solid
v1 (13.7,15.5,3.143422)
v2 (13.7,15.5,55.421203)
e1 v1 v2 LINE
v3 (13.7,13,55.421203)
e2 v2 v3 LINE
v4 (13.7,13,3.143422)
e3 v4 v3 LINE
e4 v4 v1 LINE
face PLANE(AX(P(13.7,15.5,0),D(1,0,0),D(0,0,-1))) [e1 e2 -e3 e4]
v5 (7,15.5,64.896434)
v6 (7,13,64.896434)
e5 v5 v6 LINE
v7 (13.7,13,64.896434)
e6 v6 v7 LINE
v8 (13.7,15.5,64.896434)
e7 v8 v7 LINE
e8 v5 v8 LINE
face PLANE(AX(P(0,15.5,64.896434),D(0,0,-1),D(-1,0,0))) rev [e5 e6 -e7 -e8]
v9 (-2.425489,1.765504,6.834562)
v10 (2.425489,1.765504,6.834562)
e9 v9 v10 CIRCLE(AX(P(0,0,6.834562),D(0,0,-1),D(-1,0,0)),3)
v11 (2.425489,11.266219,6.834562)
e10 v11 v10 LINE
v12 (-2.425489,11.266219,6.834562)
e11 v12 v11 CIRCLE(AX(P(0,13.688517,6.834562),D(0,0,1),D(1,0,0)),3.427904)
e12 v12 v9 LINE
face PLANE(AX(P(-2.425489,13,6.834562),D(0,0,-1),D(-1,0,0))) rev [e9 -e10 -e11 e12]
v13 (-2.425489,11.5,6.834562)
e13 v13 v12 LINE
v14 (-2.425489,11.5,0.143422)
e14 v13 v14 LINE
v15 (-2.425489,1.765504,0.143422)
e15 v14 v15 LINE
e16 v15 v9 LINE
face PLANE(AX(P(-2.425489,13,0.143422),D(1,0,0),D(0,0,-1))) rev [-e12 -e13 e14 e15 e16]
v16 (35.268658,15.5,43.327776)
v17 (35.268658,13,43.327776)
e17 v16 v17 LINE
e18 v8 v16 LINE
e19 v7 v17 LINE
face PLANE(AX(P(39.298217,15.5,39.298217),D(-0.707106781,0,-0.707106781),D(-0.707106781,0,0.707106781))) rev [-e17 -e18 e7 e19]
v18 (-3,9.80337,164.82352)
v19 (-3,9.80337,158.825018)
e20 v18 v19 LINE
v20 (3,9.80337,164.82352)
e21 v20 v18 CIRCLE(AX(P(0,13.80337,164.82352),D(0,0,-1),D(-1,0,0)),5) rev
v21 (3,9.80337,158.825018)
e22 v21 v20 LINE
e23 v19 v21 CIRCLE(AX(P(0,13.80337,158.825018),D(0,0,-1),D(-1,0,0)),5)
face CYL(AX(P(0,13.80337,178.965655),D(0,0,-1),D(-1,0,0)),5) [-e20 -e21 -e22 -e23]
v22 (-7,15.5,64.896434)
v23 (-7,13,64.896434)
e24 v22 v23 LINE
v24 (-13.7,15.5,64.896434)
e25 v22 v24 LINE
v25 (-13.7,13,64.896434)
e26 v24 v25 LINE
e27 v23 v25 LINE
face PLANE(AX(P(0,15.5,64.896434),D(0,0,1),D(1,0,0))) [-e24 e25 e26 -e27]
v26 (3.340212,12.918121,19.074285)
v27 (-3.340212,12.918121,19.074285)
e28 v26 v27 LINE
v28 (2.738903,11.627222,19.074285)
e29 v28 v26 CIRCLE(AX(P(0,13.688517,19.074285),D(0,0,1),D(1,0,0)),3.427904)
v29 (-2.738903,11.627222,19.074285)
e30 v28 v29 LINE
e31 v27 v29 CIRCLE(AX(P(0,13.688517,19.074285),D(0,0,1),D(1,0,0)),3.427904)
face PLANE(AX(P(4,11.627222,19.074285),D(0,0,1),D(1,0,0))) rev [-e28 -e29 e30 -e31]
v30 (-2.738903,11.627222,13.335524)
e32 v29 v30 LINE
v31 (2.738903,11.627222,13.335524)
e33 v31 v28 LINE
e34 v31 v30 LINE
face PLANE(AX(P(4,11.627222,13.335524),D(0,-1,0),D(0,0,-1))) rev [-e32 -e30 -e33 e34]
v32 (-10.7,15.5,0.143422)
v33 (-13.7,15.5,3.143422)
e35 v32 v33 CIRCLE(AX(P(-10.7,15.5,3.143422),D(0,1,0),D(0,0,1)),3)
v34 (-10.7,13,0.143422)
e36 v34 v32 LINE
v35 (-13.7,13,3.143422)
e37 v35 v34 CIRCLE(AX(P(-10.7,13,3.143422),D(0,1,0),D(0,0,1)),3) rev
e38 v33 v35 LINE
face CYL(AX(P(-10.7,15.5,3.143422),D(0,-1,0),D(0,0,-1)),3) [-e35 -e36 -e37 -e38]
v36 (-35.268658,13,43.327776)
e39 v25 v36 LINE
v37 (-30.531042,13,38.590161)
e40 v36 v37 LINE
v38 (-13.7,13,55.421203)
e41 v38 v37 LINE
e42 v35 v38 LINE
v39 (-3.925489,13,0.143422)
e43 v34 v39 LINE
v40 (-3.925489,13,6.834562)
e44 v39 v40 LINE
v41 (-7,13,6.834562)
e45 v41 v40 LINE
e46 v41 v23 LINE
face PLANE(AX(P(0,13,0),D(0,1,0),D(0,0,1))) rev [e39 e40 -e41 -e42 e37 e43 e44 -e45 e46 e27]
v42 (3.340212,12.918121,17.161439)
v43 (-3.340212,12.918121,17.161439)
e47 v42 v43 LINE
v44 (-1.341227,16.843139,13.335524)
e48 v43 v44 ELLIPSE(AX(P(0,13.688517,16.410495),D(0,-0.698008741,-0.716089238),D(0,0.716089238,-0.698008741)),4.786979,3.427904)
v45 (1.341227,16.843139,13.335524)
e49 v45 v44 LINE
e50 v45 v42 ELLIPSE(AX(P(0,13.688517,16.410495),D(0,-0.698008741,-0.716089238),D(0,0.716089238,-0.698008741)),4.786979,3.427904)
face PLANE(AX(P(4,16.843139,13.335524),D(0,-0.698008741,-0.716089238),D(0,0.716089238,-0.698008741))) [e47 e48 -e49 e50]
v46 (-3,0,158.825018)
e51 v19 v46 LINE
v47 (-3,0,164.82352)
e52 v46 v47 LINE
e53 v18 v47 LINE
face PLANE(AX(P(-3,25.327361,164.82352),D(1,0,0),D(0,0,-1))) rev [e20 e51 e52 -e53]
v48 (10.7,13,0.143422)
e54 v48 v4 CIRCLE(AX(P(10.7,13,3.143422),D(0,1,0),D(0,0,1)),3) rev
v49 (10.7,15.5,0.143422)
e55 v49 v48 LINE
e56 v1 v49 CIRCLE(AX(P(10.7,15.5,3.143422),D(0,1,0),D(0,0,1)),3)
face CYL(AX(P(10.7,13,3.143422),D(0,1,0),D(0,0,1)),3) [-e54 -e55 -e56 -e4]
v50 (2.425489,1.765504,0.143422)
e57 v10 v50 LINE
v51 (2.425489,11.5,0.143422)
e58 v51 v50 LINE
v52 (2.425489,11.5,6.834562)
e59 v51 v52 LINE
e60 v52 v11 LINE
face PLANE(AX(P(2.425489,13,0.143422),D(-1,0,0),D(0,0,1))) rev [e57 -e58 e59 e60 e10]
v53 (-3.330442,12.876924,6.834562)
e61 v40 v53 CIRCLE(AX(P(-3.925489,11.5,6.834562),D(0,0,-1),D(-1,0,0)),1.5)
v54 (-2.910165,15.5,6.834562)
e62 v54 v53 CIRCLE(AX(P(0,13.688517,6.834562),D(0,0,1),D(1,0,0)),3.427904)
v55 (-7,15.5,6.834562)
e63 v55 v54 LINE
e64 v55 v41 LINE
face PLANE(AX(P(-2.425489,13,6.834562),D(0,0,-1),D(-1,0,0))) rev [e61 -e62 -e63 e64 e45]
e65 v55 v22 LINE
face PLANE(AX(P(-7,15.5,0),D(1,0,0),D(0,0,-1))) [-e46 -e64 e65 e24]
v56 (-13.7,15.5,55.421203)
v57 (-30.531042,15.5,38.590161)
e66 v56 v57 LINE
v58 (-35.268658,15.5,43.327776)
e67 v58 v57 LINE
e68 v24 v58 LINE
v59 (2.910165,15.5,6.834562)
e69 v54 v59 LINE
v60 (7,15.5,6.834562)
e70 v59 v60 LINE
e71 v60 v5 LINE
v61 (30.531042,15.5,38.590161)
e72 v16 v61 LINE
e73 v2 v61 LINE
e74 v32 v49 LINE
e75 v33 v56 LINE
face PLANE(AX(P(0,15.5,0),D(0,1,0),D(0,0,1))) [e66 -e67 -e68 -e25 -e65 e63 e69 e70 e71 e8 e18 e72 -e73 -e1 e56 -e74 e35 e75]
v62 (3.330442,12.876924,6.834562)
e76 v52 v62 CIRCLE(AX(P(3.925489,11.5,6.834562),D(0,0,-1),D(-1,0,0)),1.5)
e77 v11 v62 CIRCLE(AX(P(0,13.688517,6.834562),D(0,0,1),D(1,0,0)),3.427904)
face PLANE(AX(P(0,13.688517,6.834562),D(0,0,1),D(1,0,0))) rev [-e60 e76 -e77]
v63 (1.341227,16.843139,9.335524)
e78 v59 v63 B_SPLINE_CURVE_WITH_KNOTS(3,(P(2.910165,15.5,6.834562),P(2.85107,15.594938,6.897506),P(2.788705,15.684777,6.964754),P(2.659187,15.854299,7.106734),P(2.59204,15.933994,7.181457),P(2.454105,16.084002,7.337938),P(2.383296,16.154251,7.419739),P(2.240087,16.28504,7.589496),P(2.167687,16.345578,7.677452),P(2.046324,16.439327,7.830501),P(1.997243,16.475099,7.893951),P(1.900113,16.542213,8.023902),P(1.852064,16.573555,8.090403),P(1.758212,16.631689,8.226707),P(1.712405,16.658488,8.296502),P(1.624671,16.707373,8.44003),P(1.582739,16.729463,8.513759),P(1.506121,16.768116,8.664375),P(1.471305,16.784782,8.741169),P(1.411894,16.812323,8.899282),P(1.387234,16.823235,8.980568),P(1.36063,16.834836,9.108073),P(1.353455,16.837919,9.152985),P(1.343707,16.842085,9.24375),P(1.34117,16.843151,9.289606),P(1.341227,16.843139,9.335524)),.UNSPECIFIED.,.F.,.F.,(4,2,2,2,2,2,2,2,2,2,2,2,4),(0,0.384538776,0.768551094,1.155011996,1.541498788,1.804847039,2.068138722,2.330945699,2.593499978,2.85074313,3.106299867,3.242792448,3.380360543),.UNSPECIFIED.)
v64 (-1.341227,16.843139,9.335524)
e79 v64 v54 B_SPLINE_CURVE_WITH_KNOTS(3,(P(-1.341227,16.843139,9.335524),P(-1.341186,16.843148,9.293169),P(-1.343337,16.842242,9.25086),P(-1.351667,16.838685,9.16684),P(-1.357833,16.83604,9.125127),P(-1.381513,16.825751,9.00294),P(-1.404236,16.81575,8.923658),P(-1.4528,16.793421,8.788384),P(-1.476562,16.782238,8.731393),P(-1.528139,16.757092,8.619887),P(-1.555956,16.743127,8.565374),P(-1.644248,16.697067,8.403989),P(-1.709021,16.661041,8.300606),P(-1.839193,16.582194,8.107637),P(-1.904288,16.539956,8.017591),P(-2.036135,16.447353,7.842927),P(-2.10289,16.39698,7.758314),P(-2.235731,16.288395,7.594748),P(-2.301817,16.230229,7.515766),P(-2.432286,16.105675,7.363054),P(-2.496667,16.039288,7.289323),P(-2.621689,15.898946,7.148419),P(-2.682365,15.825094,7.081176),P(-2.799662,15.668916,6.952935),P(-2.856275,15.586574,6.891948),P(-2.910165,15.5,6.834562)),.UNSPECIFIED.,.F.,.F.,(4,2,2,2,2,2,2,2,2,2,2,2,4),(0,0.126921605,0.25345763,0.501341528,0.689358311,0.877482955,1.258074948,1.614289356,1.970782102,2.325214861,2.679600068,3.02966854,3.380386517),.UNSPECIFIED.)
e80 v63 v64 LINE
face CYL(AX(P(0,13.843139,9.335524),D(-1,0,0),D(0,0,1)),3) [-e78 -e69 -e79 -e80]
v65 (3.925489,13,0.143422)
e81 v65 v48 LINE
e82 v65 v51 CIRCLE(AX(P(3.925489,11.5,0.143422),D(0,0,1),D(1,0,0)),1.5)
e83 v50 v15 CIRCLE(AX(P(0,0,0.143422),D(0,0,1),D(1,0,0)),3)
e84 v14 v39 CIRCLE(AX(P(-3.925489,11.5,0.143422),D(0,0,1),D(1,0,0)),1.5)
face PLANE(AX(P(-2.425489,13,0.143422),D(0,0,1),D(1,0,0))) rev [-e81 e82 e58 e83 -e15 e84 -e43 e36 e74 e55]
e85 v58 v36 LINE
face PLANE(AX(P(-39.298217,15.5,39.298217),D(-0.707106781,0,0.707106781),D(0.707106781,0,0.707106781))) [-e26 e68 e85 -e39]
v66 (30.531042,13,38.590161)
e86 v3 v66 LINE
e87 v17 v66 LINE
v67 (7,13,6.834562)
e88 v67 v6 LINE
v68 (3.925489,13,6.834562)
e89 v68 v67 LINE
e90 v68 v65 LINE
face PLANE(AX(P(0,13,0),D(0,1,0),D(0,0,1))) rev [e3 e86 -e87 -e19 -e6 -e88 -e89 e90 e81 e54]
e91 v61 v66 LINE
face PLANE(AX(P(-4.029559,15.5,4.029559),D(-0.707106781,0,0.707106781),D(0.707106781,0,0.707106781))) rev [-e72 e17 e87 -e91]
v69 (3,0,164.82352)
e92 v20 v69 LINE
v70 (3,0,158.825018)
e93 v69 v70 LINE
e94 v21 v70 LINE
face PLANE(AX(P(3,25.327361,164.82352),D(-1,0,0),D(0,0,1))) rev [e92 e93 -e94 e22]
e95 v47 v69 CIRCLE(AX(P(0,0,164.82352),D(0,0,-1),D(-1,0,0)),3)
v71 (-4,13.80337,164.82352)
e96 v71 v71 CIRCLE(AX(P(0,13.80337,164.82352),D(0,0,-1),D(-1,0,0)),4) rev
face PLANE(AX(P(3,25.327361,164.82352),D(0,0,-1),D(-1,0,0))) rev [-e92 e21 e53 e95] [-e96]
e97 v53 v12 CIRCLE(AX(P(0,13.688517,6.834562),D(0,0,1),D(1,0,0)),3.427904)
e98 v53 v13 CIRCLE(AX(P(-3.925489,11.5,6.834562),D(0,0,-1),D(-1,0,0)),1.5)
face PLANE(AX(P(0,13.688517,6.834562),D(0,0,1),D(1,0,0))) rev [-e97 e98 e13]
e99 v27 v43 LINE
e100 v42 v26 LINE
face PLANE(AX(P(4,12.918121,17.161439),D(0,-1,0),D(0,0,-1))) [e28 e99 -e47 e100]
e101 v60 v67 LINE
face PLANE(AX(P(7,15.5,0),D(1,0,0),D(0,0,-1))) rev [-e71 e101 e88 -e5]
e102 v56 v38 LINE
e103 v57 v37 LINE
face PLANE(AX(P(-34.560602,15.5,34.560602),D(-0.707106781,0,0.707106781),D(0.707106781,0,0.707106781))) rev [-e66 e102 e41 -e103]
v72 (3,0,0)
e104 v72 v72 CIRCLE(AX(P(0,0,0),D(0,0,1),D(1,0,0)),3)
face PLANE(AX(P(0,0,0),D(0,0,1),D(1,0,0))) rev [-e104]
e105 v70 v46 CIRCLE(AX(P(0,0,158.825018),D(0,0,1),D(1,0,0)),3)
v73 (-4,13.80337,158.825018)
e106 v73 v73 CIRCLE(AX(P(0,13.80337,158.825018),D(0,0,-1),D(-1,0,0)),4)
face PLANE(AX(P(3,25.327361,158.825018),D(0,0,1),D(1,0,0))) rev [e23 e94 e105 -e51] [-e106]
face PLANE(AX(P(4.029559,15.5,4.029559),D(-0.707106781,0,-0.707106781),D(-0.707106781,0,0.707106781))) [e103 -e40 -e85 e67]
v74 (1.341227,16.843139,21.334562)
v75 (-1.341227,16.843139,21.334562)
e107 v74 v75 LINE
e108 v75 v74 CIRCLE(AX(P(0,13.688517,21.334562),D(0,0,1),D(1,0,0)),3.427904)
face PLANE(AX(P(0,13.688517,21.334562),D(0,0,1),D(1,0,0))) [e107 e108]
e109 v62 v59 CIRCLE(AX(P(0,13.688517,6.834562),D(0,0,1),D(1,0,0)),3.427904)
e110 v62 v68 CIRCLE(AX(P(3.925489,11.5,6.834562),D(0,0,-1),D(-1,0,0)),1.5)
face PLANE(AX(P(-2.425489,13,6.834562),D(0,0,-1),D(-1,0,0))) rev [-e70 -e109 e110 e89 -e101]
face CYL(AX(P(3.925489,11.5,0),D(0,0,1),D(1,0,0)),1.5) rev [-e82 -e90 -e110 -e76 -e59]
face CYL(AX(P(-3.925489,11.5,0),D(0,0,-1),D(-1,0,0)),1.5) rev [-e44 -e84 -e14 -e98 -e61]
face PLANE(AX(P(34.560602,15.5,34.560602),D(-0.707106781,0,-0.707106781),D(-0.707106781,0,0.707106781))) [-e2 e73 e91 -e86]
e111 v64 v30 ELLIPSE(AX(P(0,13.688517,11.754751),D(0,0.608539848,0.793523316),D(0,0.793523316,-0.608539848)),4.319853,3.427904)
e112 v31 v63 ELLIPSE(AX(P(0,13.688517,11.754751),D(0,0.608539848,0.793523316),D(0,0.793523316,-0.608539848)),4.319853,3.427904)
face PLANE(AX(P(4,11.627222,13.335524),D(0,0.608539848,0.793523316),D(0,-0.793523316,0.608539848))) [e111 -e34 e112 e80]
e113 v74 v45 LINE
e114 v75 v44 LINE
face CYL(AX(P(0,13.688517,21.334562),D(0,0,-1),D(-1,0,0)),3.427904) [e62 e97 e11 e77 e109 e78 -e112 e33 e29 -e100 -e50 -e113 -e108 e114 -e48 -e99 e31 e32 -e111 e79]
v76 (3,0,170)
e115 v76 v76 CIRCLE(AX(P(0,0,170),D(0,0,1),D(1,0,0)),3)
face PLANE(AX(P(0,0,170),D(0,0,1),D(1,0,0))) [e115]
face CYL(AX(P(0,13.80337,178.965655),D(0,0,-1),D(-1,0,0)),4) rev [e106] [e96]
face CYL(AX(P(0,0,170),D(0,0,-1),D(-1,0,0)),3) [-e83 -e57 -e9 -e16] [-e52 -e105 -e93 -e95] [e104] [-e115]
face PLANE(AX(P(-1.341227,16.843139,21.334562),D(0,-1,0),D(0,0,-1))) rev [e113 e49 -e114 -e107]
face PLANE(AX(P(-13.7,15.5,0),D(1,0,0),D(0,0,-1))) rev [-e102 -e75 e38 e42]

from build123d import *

# Parameters (mm, degrees)
SKETCH1_R               = 3
BOSS_EXTRUDE1_DEPTH     = 170
SKETCH3_W               = 4.850977856
SKETCH3_H               = 6.691139058
BOSS_EXTRUDE2_DEPTH     = 13
SKETCH5_W               = 14
SKETCH5_H               = 6.691139058
BOSS_EXTRUDE4_DEPTH     = 2.5
FILLET1_R               = 1.5
FILLET2_R               = 3
BOSS_EXTRUDE6_DEPTH     = 14.5
FILLET3_R               = 3
CUT_EXTRUDE1_DEPTH      = 4
CUT_EXTRUDE1_DEPTH_BACK = 4.5
SKETCH15_W              = 6
SKETCH15_H              = 5.998501846
BOSS_EXTRUDE7_DEPTH     = 16.843139176
SKETCH16_R              = 5
SKETCH16_R_2            = 4
BOSS_EXTRUDE9_DEPTH     = 5.998501846
CUT_EXTRUDE6_START      = -5.998501846
SKETCH17_R              = 4
CUT_EXTRUDE6_DEPTH      = 5.998501846


with BuildPart() as part:
    # Sketch1 → Boss-Extrude1 (new body)
    with BuildSketch(Plane.XY):
        Circle(SKETCH1_R)
    extrude(amount=BOSS_EXTRUDE1_DEPTH)

    # Sketch3 → Boss-Extrude2 (add)
    with BuildSketch(Plane(origin=(0, 0, 0), x_dir=(1, 0, 0), z_dir=(0, 1, 0))):
        with Locations((0, -3.488992019)):
            Rectangle(SKETCH3_W, SKETCH3_H)
    extrude(amount=BOSS_EXTRUDE2_DEPTH)

    # Sketch5 → Boss-Extrude4 (add)
    with BuildSketch(Plane(origin=(0, 13, 0), x_dir=(1, 0, 0), z_dir=(0, 1, 0))):
        with Locations((0, -3.488992019)):
            Rectangle(SKETCH5_W, SKETCH5_H)
        Polygon((-7, -6.834561548), (-7, -0.14342249), (-13.7, -0.14342249), (-13.7, -55.421203077), (-30.531042429, -38.590160648), (-35.268657863, -43.327776082), (-13.7, -64.896433945), (-7, -64.896433945), align=None)
        Polygon((13.7, -0.14342249), (7, -0.14342249), (7, -6.834561548), (7, -64.896433945), (13.7, -64.896433945), (35.268657863, -43.327776082), (30.531042429, -38.590160648), (13.7, -55.421203077), align=None)
    extrude(amount=BOSS_EXTRUDE4_DEPTH)

    # Fillet1
    fillet1_edges = [part.edges().sort_by_distance(p)[0] for p in [
        (-2.425488928, 13, 3.488992019),
        (2.425488928, 13, 3.488992019),
    ]]
    fillet(fillet1_edges, radius=FILLET1_R)

    # Fillet2
    fillet2_edges = [part.edges().sort_by_distance(p)[0] for p in [
        (13.7, 14.25, 0.14342249),
        (-13.7, 14.25, 0.14342249),
    ]]
    fillet(fillet2_edges, radius=FILLET2_R)

    # Sketch8 → Boss-Extrude6 (add)
    with BuildSketch(Plane.XY.offset(6.834561548)):
        with BuildLine():
            Line((-1.341226683, 16.843139176), (1.341226683, 16.843139176))
            ThreePointArc((1.341226683, 16.843139176), (0, 10.260613318), (-1.341226683, 16.843139176))
        make_face()
    extrude(amount=BOSS_EXTRUDE6_DEPTH)

    # Fillet3
    # the kernel refuses this fillet: 3 mm, written as the material it takes off along each edge
    with BuildSketch(Plane(origin=(-7.593632325, 16.843139176, 6.834561548), x_dir=(0, -1.0, 1.7735276910753176e-12), z_dir=(1, 0, 0))) as fillet3_piece_1:
        with BuildLine():
            CenterArc((3, -2.500962257), FILLET3_R, 123.524048603, 56.475951397)
            Line((0, -2.500962257), (-0.06, -2.500962257))
            Line((-0.06, -2.500962257), (-0.06, 0))
            Line((-0.06, 0), (0, 0.06))
            ThreePointArc((0, 0.06), (0.671569588, 0.06), (1.31000196, 0.050019245))
            Line((1.31000196, 0.050019245), (1.343139176, 0))
        make_face()
    extrude(amount=15.187264651, mode=Mode.SUBTRACT)

    # Sketch14 → Cut-Extrude1 (cut, two sides: drawn at the far end of the back side and taken through both)
    with BuildSketch(Plane(origin=(0, 0, 0), x_dir=(0, 0, -1), z_dir=(1, 0, 0)).offset(-CUT_EXTRUDE1_DEPTH_BACK)):
        Polygon((-9.335523805, 16.843139176), (-13.335523805, 16.843139176), (-17.161439006, 12.918121422), (-19.074284697, 12.918121422), (-19.074284697, 11.627222293), (-13.335523805, 11.627222293), align=None)
    extrude(amount=CUT_EXTRUDE1_DEPTH + CUT_EXTRUDE1_DEPTH_BACK, mode=Mode.SUBTRACT)

    # Sketch15 → Boss-Extrude7 (add)
    with BuildSketch(Plane(origin=(0, 0, 0), x_dir=(1, 0, 0), z_dir=(0, 1, 0))):
        with Locations((0, -161.824268897)):
            Rectangle(SKETCH15_W, SKETCH15_H)
    extrude(amount=BOSS_EXTRUDE7_DEPTH)

    # Sketch16 → Boss-Extrude9 (add)
    with BuildSketch(Plane(origin=(0, 0, 158.825017974), x_dir=(-1, 0, 0), z_dir=(0, 0, -1))):
        with Locations((0, 13.803369952)):
            Circle(SKETCH16_R)
        with Locations((0, 13.803369952)):
            Circle(SKETCH16_R_2, mode=Mode.SUBTRACT)
    extrude(amount=-BOSS_EXTRUDE9_DEPTH)

    # Sketch17 → Cut-Extrude6 (cut)
    with BuildSketch(Plane.XY.offset(164.82351982).offset(CUT_EXTRUDE6_START)):
        with Locations(Location((0, 13.803369952, 0), (0, 0, 180))):
            Circle(SKETCH17_R)
    extrude(amount=CUT_EXTRUDE6_DEPTH, mode=Mode.SUBTRACT)


solid = part.part
